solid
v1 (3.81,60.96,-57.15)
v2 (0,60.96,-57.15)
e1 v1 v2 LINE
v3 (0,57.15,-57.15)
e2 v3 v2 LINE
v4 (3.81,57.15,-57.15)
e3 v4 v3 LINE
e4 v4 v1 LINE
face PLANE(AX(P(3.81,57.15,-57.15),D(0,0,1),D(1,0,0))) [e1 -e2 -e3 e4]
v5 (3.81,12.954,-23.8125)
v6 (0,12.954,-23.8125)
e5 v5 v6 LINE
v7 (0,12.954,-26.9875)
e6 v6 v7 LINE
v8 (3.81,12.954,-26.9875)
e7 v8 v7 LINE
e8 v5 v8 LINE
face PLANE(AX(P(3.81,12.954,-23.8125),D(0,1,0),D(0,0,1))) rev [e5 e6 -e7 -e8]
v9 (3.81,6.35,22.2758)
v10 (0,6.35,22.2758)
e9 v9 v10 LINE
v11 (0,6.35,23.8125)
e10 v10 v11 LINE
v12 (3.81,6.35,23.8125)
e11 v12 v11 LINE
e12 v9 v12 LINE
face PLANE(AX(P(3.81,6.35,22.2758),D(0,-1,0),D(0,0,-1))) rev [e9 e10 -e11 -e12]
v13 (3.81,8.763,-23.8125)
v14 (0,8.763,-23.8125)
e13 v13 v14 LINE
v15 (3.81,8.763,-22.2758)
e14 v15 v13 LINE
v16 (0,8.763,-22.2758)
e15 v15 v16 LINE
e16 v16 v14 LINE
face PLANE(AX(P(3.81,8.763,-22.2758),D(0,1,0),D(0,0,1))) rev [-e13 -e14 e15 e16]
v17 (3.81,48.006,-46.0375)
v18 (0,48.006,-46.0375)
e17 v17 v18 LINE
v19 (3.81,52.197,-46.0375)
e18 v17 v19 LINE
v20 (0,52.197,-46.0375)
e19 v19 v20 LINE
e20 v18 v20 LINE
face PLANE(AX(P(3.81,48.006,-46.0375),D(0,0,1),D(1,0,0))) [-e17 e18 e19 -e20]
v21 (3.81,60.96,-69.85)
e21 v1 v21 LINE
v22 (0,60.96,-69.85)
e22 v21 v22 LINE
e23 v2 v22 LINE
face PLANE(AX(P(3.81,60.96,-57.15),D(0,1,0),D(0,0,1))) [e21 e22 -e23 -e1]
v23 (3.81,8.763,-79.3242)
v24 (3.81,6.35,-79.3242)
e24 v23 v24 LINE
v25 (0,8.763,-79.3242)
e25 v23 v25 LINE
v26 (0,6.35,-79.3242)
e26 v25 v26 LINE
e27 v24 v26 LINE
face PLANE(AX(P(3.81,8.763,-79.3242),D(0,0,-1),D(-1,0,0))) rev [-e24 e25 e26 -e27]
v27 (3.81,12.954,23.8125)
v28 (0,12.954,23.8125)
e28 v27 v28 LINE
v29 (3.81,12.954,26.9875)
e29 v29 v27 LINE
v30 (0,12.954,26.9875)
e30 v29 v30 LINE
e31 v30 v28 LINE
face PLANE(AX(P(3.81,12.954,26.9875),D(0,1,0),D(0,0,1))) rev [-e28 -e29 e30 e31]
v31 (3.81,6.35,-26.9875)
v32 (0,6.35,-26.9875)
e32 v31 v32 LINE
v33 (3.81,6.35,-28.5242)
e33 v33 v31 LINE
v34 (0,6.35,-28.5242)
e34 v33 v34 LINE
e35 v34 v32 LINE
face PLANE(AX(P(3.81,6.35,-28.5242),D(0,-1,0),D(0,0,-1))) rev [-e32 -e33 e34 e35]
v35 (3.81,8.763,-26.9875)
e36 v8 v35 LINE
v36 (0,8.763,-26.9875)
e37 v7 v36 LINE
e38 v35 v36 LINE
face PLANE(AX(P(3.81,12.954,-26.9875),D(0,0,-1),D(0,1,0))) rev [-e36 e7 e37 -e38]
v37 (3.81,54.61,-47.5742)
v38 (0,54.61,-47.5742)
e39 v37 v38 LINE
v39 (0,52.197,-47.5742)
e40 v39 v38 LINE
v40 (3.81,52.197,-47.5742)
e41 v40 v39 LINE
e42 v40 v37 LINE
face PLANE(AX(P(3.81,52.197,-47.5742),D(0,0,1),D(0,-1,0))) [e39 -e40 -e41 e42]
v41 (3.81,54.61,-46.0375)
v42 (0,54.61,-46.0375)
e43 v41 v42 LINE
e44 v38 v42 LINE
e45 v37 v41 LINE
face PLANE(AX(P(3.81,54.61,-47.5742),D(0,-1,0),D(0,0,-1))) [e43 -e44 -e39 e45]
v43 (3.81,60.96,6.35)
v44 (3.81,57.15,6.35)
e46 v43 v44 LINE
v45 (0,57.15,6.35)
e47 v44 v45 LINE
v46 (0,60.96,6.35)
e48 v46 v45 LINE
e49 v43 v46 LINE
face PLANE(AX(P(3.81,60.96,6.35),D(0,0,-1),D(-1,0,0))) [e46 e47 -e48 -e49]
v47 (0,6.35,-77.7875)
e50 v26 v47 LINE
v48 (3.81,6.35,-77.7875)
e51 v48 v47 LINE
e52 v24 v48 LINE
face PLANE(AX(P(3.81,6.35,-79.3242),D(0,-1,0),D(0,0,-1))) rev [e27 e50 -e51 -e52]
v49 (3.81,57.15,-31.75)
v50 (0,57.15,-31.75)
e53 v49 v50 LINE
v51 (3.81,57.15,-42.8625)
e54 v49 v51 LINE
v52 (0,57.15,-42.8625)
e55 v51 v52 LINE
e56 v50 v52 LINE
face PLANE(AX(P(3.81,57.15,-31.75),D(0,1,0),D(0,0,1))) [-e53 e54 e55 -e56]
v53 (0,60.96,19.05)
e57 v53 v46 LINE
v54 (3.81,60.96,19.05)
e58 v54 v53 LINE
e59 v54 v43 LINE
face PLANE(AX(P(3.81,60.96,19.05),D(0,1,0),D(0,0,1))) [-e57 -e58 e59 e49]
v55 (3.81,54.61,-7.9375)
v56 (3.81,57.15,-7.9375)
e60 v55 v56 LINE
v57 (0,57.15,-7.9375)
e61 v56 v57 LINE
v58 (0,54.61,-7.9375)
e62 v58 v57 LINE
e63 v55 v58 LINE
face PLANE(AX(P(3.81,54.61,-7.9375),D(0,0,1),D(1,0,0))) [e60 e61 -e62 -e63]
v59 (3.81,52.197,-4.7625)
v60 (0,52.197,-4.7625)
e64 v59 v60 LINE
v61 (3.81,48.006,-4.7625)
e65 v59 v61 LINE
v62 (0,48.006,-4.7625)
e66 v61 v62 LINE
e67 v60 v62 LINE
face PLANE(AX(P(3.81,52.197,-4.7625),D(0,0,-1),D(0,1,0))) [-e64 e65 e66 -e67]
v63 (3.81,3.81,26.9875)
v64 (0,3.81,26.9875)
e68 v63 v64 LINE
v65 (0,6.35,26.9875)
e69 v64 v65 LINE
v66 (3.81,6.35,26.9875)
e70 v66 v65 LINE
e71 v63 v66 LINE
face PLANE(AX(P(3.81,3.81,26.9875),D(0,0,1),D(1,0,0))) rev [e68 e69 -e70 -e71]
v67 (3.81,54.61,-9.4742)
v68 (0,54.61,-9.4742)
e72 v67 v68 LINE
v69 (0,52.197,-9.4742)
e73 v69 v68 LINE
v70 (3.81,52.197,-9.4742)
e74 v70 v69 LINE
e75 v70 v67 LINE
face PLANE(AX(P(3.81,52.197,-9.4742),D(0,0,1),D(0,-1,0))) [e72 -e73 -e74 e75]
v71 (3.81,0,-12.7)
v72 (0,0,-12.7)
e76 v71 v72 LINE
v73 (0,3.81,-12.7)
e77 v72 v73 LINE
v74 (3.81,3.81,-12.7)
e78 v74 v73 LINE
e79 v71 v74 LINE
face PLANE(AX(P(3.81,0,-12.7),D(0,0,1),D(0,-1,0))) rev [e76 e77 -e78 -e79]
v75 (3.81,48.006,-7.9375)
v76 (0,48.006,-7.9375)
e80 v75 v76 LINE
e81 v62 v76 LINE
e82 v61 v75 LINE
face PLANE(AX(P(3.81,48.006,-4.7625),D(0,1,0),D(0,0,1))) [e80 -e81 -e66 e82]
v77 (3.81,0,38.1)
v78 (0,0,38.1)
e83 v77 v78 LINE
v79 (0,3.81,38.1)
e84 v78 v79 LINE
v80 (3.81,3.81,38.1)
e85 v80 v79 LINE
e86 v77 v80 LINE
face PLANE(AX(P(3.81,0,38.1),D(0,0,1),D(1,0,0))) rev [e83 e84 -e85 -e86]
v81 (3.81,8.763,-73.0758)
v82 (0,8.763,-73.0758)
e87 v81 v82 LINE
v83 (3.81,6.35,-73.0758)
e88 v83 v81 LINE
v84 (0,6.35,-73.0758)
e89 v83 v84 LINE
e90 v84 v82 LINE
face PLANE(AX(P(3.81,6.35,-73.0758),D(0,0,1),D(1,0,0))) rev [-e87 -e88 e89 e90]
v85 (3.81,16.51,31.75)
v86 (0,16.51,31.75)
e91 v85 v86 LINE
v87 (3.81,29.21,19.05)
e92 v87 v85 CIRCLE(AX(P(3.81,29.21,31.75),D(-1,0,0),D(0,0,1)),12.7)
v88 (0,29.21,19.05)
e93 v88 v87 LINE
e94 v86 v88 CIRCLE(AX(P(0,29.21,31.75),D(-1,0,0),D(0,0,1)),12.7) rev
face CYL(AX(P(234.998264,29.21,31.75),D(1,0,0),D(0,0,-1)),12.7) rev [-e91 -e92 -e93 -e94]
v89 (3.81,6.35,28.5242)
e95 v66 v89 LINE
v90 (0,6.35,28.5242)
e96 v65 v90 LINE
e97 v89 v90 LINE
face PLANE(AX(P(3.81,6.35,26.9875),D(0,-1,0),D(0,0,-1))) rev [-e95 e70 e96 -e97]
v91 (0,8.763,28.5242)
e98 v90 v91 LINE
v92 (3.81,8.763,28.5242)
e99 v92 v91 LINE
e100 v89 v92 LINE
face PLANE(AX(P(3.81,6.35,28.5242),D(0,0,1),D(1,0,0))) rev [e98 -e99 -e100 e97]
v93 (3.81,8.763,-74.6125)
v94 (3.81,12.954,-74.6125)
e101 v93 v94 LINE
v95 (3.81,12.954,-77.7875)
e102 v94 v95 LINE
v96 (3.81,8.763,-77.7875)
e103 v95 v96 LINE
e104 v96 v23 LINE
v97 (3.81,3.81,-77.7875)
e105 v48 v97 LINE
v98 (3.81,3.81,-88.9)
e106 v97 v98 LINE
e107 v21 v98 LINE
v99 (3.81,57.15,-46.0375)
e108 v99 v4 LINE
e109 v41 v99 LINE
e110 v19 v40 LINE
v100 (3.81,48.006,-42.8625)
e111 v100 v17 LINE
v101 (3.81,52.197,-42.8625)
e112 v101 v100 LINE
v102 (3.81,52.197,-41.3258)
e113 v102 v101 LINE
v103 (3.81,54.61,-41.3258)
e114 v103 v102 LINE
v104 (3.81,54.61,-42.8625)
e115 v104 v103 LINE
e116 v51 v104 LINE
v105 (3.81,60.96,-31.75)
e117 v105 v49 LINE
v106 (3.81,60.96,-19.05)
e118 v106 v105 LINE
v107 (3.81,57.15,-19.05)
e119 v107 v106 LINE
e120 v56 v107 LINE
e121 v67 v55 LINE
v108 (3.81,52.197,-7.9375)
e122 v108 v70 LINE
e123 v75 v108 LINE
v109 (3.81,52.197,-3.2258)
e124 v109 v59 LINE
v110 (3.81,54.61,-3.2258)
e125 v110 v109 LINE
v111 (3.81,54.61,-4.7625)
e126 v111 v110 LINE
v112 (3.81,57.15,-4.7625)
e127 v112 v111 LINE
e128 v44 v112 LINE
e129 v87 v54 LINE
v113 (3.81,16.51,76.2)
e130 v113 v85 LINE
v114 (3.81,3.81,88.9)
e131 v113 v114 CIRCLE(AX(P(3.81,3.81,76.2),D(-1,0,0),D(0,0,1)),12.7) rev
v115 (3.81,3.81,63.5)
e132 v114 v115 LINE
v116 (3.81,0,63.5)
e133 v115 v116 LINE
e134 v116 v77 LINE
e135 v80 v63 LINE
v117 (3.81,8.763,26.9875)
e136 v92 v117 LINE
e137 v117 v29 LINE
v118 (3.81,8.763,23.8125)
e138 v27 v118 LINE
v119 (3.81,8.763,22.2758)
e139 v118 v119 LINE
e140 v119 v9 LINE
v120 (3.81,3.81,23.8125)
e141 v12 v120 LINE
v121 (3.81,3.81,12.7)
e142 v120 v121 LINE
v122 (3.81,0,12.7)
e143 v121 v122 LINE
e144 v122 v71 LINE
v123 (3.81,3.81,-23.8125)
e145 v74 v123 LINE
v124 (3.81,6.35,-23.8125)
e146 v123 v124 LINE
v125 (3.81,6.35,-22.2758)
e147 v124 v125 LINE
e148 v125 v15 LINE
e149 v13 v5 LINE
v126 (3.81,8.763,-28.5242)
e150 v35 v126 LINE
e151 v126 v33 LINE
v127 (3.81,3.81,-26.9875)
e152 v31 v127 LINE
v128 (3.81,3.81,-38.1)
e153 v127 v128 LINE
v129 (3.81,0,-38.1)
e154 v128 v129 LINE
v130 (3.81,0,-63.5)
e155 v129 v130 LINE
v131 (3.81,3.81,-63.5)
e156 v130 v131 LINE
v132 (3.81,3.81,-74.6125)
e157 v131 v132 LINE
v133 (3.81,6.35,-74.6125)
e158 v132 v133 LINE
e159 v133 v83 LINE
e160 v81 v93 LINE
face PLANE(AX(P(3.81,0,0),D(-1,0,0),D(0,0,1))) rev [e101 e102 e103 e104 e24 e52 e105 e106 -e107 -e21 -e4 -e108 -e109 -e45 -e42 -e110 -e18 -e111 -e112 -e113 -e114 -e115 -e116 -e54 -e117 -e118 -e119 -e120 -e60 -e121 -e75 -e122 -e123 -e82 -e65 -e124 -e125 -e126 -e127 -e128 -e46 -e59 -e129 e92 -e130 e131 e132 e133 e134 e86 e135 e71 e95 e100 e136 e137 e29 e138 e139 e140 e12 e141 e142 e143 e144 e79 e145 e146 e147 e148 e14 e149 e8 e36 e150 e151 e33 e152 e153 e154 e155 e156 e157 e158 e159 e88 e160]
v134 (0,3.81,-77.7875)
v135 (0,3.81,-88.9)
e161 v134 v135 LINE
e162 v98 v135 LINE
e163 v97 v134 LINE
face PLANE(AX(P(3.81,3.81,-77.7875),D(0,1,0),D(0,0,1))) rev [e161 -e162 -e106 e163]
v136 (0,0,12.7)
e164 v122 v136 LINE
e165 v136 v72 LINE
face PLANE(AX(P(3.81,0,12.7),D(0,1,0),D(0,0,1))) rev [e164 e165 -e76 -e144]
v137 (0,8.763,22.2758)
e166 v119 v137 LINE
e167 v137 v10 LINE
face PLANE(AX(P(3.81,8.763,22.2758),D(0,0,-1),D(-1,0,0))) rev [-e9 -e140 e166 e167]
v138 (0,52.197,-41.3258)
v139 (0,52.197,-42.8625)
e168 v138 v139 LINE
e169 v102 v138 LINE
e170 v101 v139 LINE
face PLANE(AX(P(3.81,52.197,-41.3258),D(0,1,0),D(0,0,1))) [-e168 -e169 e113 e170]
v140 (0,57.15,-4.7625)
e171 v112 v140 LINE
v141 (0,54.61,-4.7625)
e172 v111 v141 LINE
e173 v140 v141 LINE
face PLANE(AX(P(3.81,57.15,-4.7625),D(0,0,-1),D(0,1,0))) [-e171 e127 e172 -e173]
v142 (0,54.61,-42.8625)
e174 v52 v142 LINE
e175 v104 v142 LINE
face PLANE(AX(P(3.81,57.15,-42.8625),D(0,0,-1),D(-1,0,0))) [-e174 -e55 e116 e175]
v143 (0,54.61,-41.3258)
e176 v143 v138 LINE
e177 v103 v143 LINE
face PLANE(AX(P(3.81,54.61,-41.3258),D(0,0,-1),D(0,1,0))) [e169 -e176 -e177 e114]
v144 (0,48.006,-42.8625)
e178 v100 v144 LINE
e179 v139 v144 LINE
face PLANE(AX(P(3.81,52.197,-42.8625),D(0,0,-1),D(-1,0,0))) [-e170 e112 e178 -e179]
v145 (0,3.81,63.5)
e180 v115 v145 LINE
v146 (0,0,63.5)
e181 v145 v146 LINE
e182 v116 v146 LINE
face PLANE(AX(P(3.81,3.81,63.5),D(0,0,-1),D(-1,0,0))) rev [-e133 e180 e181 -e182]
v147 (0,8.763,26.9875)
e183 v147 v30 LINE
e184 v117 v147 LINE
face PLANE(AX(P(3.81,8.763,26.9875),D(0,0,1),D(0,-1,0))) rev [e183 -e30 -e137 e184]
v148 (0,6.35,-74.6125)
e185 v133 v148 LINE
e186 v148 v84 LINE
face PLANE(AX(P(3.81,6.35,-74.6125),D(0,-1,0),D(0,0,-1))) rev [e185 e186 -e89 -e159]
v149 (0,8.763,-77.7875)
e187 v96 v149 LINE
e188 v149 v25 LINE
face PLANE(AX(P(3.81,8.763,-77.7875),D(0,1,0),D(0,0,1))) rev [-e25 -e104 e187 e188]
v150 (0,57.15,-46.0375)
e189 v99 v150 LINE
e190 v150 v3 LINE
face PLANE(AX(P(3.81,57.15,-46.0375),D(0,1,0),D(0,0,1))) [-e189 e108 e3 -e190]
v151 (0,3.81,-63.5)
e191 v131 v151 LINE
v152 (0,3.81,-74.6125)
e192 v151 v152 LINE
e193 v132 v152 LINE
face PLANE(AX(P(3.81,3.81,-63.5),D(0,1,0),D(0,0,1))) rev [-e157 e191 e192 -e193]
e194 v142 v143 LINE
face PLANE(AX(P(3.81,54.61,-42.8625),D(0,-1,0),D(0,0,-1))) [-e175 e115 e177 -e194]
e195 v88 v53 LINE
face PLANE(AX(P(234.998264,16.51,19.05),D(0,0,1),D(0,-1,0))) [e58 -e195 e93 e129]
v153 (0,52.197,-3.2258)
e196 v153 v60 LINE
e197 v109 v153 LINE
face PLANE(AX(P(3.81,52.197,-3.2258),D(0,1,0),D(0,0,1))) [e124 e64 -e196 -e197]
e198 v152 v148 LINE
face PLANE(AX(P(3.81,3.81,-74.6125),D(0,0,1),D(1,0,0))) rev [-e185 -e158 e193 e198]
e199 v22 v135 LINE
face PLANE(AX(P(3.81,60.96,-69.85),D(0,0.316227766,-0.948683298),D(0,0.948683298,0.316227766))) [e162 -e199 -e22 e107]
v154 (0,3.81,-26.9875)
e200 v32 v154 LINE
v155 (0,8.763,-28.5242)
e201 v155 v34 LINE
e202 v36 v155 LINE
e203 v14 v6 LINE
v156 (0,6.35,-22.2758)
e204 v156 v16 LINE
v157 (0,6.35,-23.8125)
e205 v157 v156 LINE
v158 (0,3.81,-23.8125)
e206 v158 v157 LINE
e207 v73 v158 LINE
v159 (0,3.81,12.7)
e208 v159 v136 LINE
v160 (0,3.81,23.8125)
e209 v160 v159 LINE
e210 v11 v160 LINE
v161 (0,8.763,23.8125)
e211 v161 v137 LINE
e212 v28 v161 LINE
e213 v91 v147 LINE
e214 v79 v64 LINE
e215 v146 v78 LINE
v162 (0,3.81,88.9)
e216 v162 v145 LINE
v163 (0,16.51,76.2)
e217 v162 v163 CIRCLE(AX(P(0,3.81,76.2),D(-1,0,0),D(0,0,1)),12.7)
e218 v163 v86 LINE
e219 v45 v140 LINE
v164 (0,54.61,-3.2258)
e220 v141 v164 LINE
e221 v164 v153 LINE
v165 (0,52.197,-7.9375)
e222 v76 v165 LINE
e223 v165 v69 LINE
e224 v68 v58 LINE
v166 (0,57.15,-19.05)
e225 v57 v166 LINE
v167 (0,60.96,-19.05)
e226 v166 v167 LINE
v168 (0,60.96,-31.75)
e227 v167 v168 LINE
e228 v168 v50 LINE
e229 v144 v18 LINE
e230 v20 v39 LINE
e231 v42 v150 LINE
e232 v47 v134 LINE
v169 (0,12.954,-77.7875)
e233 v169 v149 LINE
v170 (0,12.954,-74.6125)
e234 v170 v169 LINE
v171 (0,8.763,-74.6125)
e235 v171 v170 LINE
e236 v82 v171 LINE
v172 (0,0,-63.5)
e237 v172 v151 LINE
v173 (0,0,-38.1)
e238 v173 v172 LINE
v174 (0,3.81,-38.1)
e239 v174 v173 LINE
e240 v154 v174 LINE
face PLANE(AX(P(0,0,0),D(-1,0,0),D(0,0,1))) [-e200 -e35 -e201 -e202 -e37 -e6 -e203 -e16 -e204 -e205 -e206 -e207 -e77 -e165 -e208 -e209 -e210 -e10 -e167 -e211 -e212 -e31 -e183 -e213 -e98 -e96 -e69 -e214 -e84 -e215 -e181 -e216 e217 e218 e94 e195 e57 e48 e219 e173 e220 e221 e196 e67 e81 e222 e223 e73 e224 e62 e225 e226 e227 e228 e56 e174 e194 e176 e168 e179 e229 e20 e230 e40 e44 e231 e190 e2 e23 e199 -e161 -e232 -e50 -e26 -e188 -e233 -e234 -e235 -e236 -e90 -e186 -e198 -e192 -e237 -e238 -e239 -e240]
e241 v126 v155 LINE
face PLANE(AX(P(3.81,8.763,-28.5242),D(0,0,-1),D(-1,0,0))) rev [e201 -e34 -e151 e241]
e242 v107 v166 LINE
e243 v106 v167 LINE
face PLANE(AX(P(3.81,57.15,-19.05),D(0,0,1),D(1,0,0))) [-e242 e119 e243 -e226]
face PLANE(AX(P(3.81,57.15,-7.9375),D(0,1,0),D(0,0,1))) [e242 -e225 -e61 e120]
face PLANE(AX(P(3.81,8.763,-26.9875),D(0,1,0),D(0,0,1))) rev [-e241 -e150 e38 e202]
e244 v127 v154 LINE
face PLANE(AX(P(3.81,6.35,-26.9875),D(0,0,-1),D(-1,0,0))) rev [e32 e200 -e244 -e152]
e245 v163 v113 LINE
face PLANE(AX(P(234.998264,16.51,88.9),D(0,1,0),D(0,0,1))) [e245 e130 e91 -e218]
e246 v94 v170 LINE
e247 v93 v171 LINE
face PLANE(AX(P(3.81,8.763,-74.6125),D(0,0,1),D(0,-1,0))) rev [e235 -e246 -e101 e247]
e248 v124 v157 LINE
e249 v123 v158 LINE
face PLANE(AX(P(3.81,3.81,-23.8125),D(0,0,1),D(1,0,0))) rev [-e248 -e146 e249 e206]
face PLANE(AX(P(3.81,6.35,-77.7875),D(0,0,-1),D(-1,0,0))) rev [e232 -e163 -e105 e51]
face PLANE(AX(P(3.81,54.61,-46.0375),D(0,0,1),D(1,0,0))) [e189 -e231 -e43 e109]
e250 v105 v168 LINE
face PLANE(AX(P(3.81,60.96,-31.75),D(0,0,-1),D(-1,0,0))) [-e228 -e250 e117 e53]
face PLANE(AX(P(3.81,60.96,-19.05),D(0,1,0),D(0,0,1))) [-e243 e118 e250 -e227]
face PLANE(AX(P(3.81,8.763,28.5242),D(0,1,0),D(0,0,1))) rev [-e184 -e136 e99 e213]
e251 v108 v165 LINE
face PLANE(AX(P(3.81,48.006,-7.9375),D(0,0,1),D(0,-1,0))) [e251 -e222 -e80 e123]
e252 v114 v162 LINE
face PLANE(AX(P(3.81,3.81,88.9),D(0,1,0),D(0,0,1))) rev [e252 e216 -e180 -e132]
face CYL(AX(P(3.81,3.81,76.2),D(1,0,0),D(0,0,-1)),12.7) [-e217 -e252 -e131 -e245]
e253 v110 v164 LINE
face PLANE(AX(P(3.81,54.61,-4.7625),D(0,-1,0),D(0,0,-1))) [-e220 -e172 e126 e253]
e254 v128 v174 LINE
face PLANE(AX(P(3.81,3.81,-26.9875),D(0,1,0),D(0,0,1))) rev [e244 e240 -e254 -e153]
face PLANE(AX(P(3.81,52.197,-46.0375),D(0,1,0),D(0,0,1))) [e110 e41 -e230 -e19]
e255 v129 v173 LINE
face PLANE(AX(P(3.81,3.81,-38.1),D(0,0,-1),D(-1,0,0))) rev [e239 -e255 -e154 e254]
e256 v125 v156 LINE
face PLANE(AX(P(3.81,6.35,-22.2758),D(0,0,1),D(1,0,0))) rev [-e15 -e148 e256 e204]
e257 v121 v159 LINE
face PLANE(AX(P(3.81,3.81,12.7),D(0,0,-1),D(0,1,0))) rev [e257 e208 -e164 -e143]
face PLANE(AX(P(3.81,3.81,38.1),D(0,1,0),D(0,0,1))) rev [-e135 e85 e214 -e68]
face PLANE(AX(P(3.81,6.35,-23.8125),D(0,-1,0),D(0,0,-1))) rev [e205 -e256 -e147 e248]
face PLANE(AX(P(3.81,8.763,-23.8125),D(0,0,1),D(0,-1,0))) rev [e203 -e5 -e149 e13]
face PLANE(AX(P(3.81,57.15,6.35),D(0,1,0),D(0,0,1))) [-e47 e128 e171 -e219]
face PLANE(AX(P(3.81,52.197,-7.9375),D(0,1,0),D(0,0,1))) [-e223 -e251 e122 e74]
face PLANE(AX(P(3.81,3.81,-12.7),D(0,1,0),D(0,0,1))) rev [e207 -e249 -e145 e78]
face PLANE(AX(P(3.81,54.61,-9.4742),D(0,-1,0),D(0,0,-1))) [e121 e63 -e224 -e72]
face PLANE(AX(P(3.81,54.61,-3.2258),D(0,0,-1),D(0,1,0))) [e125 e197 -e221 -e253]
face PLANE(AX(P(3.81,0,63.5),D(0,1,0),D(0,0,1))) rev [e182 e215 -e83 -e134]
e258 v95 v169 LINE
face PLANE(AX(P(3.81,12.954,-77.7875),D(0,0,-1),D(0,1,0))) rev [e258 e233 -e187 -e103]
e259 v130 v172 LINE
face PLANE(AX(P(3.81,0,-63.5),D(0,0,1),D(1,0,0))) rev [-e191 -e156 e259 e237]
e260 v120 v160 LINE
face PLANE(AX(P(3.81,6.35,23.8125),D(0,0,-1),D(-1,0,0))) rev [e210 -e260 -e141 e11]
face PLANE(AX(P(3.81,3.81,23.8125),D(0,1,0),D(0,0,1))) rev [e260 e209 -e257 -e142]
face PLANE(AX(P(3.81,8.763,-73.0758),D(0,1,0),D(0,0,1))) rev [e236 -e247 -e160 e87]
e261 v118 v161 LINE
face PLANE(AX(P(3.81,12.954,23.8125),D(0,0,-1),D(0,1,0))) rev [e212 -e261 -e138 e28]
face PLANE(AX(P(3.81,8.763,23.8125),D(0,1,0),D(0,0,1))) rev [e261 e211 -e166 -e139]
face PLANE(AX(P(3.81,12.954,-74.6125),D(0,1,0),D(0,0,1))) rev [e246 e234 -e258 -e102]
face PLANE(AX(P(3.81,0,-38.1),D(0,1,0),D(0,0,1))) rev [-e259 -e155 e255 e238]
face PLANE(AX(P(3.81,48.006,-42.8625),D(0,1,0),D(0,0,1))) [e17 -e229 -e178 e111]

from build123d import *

# Parameters (mm, degrees)
BOSS_EXTRUDE1_DEPTH     = 3.81
CUT_EXTRUDE1_DEPTH      = 108.860315687
CUT_EXTRUDE1_DEPTH_BACK = 108.860315687
FILLET3_START           = -1
FILLET3_DEPTH           = 6
FILLET3_2_DEPTH         = 3.81


with BuildPart() as part:
    # Sketch1 → Boss-Extrude1 (new body)
    with BuildSketch(Plane(origin=(0, 0, 0), x_dir=(0, 0, -1), z_dir=(1, 0, 0))):
        Polygon((-88.9, 3.81), (-63.5, 3.81), (-63.5, 0), (-38.1, 0), (-38.1, 3.81), (-26.9875, 3.81), (-26.9875, 6.35), (-28.5242, 6.35), (-28.5242, 8.763), (-26.9875, 8.763), (-26.9875, 12.954), (-23.8125, 12.954), (-23.8125, 8.763), (-22.2758, 8.763), (-22.2758, 6.35), (-23.8125, 6.35), (-23.8125, 3.81), (-12.7, 3.81), (-12.7, 0), (12.7, 0), (12.7, 3.81), (23.8125, 3.81), (23.8125, 6.35), (22.2758, 6.35), (22.2758, 8.763), (23.8125, 8.763), (23.8125, 12.954), (26.9875, 12.954), (26.9875, 8.763), (28.5242, 8.763), (28.5242, 6.35), (26.9875, 6.35), (26.9875, 3.81), (38.1, 3.81), (38.1, 0), (63.5, 0), (63.5, 3.81), (74.6125, 3.81), (74.6125, 6.35), (73.0758, 6.35), (73.0758, 8.763), (74.6125, 8.763), (74.6125, 12.954), (77.7875, 12.954), (77.7875, 8.763), (79.3242, 8.763), (79.3242, 6.35), (77.7875, 6.35), (77.7875, 3.81), (88.9, 3.81), (69.85, 60.96), (57.15, 60.96), (57.15, 57.15), (46.0375, 57.15), (46.0375, 54.61), (47.5742, 54.61), (47.5742, 52.197), (46.0375, 52.197), (46.0375, 48.006), (42.8625, 48.006), (42.8625, 52.197), (41.3258, 52.197), (41.3258, 54.61), (42.8625, 54.61), (42.8625, 57.15), (31.75, 57.15), (31.75, 60.96), (19.05, 60.96), (19.05, 57.15), (7.9375, 57.15), (7.9375, 54.61), (9.4742, 54.61), (9.4742, 52.197), (7.9375, 52.197), (7.9375, 48.006), (4.7625, 48.006), (4.7625, 52.197), (3.2258, 52.197), (3.2258, 54.61), (4.7625, 54.61), (4.7625, 57.15), (-6.35, 57.15), (-6.35, 60.96), (-19.05, 60.96), (-88.9, 16.51), align=None)
    extrude(amount=BOSS_EXTRUDE1_DEPTH)

    # Sketch2 → Cut-Extrude1 (cut, two sides: drawn at the far end of the back side and taken through both)
    with BuildSketch(Plane(origin=(0, 0, 0), x_dir=(0, 0, -1), z_dir=(1, 0, 0)).offset(-CUT_EXTRUDE1_DEPTH_BACK)):
        Polygon((-37.957173184, 48.928162519), (-88.9, 16.51), (-19.05, 16.51), (-19.05, 60.96), align=None)
    extrude(amount=CUT_EXTRUDE1_DEPTH + CUT_EXTRUDE1_DEPTH_BACK, mode=Mode.SUBTRACT)

    # Fillet3: read off the stored shape, not the designer's step
    # Fillet3 outline → Fillet3 (cut)
    with BuildSketch(Plane.YZ.offset(FILLET3_START)):
        with BuildLine():
            ThreePointArc((3.81, 88.9), (12.790256121, 85.180256121), (16.51, 76.2))
            Line((16.51, 76.2), (16.51, 88.9))
            Line((16.51, 88.9), (3.81, 88.9))
        make_face()
    extrude(amount=FILLET3_DEPTH, mode=Mode.SUBTRACT)

    # Fillet3 2 outline → Fillet3 2 (add)
    with BuildSketch(Plane.YZ):
        with BuildLine():
            ThreePointArc((29.21, 19.05), (20.229743879, 22.769743879), (16.51, 31.75))
            Line((16.51, 31.75), (16.51, 19.05))
            Line((16.51, 19.05), (29.21, 19.05))
        make_face()
    extrude(amount=FILLET3_2_DEPTH)


solid = part.part
